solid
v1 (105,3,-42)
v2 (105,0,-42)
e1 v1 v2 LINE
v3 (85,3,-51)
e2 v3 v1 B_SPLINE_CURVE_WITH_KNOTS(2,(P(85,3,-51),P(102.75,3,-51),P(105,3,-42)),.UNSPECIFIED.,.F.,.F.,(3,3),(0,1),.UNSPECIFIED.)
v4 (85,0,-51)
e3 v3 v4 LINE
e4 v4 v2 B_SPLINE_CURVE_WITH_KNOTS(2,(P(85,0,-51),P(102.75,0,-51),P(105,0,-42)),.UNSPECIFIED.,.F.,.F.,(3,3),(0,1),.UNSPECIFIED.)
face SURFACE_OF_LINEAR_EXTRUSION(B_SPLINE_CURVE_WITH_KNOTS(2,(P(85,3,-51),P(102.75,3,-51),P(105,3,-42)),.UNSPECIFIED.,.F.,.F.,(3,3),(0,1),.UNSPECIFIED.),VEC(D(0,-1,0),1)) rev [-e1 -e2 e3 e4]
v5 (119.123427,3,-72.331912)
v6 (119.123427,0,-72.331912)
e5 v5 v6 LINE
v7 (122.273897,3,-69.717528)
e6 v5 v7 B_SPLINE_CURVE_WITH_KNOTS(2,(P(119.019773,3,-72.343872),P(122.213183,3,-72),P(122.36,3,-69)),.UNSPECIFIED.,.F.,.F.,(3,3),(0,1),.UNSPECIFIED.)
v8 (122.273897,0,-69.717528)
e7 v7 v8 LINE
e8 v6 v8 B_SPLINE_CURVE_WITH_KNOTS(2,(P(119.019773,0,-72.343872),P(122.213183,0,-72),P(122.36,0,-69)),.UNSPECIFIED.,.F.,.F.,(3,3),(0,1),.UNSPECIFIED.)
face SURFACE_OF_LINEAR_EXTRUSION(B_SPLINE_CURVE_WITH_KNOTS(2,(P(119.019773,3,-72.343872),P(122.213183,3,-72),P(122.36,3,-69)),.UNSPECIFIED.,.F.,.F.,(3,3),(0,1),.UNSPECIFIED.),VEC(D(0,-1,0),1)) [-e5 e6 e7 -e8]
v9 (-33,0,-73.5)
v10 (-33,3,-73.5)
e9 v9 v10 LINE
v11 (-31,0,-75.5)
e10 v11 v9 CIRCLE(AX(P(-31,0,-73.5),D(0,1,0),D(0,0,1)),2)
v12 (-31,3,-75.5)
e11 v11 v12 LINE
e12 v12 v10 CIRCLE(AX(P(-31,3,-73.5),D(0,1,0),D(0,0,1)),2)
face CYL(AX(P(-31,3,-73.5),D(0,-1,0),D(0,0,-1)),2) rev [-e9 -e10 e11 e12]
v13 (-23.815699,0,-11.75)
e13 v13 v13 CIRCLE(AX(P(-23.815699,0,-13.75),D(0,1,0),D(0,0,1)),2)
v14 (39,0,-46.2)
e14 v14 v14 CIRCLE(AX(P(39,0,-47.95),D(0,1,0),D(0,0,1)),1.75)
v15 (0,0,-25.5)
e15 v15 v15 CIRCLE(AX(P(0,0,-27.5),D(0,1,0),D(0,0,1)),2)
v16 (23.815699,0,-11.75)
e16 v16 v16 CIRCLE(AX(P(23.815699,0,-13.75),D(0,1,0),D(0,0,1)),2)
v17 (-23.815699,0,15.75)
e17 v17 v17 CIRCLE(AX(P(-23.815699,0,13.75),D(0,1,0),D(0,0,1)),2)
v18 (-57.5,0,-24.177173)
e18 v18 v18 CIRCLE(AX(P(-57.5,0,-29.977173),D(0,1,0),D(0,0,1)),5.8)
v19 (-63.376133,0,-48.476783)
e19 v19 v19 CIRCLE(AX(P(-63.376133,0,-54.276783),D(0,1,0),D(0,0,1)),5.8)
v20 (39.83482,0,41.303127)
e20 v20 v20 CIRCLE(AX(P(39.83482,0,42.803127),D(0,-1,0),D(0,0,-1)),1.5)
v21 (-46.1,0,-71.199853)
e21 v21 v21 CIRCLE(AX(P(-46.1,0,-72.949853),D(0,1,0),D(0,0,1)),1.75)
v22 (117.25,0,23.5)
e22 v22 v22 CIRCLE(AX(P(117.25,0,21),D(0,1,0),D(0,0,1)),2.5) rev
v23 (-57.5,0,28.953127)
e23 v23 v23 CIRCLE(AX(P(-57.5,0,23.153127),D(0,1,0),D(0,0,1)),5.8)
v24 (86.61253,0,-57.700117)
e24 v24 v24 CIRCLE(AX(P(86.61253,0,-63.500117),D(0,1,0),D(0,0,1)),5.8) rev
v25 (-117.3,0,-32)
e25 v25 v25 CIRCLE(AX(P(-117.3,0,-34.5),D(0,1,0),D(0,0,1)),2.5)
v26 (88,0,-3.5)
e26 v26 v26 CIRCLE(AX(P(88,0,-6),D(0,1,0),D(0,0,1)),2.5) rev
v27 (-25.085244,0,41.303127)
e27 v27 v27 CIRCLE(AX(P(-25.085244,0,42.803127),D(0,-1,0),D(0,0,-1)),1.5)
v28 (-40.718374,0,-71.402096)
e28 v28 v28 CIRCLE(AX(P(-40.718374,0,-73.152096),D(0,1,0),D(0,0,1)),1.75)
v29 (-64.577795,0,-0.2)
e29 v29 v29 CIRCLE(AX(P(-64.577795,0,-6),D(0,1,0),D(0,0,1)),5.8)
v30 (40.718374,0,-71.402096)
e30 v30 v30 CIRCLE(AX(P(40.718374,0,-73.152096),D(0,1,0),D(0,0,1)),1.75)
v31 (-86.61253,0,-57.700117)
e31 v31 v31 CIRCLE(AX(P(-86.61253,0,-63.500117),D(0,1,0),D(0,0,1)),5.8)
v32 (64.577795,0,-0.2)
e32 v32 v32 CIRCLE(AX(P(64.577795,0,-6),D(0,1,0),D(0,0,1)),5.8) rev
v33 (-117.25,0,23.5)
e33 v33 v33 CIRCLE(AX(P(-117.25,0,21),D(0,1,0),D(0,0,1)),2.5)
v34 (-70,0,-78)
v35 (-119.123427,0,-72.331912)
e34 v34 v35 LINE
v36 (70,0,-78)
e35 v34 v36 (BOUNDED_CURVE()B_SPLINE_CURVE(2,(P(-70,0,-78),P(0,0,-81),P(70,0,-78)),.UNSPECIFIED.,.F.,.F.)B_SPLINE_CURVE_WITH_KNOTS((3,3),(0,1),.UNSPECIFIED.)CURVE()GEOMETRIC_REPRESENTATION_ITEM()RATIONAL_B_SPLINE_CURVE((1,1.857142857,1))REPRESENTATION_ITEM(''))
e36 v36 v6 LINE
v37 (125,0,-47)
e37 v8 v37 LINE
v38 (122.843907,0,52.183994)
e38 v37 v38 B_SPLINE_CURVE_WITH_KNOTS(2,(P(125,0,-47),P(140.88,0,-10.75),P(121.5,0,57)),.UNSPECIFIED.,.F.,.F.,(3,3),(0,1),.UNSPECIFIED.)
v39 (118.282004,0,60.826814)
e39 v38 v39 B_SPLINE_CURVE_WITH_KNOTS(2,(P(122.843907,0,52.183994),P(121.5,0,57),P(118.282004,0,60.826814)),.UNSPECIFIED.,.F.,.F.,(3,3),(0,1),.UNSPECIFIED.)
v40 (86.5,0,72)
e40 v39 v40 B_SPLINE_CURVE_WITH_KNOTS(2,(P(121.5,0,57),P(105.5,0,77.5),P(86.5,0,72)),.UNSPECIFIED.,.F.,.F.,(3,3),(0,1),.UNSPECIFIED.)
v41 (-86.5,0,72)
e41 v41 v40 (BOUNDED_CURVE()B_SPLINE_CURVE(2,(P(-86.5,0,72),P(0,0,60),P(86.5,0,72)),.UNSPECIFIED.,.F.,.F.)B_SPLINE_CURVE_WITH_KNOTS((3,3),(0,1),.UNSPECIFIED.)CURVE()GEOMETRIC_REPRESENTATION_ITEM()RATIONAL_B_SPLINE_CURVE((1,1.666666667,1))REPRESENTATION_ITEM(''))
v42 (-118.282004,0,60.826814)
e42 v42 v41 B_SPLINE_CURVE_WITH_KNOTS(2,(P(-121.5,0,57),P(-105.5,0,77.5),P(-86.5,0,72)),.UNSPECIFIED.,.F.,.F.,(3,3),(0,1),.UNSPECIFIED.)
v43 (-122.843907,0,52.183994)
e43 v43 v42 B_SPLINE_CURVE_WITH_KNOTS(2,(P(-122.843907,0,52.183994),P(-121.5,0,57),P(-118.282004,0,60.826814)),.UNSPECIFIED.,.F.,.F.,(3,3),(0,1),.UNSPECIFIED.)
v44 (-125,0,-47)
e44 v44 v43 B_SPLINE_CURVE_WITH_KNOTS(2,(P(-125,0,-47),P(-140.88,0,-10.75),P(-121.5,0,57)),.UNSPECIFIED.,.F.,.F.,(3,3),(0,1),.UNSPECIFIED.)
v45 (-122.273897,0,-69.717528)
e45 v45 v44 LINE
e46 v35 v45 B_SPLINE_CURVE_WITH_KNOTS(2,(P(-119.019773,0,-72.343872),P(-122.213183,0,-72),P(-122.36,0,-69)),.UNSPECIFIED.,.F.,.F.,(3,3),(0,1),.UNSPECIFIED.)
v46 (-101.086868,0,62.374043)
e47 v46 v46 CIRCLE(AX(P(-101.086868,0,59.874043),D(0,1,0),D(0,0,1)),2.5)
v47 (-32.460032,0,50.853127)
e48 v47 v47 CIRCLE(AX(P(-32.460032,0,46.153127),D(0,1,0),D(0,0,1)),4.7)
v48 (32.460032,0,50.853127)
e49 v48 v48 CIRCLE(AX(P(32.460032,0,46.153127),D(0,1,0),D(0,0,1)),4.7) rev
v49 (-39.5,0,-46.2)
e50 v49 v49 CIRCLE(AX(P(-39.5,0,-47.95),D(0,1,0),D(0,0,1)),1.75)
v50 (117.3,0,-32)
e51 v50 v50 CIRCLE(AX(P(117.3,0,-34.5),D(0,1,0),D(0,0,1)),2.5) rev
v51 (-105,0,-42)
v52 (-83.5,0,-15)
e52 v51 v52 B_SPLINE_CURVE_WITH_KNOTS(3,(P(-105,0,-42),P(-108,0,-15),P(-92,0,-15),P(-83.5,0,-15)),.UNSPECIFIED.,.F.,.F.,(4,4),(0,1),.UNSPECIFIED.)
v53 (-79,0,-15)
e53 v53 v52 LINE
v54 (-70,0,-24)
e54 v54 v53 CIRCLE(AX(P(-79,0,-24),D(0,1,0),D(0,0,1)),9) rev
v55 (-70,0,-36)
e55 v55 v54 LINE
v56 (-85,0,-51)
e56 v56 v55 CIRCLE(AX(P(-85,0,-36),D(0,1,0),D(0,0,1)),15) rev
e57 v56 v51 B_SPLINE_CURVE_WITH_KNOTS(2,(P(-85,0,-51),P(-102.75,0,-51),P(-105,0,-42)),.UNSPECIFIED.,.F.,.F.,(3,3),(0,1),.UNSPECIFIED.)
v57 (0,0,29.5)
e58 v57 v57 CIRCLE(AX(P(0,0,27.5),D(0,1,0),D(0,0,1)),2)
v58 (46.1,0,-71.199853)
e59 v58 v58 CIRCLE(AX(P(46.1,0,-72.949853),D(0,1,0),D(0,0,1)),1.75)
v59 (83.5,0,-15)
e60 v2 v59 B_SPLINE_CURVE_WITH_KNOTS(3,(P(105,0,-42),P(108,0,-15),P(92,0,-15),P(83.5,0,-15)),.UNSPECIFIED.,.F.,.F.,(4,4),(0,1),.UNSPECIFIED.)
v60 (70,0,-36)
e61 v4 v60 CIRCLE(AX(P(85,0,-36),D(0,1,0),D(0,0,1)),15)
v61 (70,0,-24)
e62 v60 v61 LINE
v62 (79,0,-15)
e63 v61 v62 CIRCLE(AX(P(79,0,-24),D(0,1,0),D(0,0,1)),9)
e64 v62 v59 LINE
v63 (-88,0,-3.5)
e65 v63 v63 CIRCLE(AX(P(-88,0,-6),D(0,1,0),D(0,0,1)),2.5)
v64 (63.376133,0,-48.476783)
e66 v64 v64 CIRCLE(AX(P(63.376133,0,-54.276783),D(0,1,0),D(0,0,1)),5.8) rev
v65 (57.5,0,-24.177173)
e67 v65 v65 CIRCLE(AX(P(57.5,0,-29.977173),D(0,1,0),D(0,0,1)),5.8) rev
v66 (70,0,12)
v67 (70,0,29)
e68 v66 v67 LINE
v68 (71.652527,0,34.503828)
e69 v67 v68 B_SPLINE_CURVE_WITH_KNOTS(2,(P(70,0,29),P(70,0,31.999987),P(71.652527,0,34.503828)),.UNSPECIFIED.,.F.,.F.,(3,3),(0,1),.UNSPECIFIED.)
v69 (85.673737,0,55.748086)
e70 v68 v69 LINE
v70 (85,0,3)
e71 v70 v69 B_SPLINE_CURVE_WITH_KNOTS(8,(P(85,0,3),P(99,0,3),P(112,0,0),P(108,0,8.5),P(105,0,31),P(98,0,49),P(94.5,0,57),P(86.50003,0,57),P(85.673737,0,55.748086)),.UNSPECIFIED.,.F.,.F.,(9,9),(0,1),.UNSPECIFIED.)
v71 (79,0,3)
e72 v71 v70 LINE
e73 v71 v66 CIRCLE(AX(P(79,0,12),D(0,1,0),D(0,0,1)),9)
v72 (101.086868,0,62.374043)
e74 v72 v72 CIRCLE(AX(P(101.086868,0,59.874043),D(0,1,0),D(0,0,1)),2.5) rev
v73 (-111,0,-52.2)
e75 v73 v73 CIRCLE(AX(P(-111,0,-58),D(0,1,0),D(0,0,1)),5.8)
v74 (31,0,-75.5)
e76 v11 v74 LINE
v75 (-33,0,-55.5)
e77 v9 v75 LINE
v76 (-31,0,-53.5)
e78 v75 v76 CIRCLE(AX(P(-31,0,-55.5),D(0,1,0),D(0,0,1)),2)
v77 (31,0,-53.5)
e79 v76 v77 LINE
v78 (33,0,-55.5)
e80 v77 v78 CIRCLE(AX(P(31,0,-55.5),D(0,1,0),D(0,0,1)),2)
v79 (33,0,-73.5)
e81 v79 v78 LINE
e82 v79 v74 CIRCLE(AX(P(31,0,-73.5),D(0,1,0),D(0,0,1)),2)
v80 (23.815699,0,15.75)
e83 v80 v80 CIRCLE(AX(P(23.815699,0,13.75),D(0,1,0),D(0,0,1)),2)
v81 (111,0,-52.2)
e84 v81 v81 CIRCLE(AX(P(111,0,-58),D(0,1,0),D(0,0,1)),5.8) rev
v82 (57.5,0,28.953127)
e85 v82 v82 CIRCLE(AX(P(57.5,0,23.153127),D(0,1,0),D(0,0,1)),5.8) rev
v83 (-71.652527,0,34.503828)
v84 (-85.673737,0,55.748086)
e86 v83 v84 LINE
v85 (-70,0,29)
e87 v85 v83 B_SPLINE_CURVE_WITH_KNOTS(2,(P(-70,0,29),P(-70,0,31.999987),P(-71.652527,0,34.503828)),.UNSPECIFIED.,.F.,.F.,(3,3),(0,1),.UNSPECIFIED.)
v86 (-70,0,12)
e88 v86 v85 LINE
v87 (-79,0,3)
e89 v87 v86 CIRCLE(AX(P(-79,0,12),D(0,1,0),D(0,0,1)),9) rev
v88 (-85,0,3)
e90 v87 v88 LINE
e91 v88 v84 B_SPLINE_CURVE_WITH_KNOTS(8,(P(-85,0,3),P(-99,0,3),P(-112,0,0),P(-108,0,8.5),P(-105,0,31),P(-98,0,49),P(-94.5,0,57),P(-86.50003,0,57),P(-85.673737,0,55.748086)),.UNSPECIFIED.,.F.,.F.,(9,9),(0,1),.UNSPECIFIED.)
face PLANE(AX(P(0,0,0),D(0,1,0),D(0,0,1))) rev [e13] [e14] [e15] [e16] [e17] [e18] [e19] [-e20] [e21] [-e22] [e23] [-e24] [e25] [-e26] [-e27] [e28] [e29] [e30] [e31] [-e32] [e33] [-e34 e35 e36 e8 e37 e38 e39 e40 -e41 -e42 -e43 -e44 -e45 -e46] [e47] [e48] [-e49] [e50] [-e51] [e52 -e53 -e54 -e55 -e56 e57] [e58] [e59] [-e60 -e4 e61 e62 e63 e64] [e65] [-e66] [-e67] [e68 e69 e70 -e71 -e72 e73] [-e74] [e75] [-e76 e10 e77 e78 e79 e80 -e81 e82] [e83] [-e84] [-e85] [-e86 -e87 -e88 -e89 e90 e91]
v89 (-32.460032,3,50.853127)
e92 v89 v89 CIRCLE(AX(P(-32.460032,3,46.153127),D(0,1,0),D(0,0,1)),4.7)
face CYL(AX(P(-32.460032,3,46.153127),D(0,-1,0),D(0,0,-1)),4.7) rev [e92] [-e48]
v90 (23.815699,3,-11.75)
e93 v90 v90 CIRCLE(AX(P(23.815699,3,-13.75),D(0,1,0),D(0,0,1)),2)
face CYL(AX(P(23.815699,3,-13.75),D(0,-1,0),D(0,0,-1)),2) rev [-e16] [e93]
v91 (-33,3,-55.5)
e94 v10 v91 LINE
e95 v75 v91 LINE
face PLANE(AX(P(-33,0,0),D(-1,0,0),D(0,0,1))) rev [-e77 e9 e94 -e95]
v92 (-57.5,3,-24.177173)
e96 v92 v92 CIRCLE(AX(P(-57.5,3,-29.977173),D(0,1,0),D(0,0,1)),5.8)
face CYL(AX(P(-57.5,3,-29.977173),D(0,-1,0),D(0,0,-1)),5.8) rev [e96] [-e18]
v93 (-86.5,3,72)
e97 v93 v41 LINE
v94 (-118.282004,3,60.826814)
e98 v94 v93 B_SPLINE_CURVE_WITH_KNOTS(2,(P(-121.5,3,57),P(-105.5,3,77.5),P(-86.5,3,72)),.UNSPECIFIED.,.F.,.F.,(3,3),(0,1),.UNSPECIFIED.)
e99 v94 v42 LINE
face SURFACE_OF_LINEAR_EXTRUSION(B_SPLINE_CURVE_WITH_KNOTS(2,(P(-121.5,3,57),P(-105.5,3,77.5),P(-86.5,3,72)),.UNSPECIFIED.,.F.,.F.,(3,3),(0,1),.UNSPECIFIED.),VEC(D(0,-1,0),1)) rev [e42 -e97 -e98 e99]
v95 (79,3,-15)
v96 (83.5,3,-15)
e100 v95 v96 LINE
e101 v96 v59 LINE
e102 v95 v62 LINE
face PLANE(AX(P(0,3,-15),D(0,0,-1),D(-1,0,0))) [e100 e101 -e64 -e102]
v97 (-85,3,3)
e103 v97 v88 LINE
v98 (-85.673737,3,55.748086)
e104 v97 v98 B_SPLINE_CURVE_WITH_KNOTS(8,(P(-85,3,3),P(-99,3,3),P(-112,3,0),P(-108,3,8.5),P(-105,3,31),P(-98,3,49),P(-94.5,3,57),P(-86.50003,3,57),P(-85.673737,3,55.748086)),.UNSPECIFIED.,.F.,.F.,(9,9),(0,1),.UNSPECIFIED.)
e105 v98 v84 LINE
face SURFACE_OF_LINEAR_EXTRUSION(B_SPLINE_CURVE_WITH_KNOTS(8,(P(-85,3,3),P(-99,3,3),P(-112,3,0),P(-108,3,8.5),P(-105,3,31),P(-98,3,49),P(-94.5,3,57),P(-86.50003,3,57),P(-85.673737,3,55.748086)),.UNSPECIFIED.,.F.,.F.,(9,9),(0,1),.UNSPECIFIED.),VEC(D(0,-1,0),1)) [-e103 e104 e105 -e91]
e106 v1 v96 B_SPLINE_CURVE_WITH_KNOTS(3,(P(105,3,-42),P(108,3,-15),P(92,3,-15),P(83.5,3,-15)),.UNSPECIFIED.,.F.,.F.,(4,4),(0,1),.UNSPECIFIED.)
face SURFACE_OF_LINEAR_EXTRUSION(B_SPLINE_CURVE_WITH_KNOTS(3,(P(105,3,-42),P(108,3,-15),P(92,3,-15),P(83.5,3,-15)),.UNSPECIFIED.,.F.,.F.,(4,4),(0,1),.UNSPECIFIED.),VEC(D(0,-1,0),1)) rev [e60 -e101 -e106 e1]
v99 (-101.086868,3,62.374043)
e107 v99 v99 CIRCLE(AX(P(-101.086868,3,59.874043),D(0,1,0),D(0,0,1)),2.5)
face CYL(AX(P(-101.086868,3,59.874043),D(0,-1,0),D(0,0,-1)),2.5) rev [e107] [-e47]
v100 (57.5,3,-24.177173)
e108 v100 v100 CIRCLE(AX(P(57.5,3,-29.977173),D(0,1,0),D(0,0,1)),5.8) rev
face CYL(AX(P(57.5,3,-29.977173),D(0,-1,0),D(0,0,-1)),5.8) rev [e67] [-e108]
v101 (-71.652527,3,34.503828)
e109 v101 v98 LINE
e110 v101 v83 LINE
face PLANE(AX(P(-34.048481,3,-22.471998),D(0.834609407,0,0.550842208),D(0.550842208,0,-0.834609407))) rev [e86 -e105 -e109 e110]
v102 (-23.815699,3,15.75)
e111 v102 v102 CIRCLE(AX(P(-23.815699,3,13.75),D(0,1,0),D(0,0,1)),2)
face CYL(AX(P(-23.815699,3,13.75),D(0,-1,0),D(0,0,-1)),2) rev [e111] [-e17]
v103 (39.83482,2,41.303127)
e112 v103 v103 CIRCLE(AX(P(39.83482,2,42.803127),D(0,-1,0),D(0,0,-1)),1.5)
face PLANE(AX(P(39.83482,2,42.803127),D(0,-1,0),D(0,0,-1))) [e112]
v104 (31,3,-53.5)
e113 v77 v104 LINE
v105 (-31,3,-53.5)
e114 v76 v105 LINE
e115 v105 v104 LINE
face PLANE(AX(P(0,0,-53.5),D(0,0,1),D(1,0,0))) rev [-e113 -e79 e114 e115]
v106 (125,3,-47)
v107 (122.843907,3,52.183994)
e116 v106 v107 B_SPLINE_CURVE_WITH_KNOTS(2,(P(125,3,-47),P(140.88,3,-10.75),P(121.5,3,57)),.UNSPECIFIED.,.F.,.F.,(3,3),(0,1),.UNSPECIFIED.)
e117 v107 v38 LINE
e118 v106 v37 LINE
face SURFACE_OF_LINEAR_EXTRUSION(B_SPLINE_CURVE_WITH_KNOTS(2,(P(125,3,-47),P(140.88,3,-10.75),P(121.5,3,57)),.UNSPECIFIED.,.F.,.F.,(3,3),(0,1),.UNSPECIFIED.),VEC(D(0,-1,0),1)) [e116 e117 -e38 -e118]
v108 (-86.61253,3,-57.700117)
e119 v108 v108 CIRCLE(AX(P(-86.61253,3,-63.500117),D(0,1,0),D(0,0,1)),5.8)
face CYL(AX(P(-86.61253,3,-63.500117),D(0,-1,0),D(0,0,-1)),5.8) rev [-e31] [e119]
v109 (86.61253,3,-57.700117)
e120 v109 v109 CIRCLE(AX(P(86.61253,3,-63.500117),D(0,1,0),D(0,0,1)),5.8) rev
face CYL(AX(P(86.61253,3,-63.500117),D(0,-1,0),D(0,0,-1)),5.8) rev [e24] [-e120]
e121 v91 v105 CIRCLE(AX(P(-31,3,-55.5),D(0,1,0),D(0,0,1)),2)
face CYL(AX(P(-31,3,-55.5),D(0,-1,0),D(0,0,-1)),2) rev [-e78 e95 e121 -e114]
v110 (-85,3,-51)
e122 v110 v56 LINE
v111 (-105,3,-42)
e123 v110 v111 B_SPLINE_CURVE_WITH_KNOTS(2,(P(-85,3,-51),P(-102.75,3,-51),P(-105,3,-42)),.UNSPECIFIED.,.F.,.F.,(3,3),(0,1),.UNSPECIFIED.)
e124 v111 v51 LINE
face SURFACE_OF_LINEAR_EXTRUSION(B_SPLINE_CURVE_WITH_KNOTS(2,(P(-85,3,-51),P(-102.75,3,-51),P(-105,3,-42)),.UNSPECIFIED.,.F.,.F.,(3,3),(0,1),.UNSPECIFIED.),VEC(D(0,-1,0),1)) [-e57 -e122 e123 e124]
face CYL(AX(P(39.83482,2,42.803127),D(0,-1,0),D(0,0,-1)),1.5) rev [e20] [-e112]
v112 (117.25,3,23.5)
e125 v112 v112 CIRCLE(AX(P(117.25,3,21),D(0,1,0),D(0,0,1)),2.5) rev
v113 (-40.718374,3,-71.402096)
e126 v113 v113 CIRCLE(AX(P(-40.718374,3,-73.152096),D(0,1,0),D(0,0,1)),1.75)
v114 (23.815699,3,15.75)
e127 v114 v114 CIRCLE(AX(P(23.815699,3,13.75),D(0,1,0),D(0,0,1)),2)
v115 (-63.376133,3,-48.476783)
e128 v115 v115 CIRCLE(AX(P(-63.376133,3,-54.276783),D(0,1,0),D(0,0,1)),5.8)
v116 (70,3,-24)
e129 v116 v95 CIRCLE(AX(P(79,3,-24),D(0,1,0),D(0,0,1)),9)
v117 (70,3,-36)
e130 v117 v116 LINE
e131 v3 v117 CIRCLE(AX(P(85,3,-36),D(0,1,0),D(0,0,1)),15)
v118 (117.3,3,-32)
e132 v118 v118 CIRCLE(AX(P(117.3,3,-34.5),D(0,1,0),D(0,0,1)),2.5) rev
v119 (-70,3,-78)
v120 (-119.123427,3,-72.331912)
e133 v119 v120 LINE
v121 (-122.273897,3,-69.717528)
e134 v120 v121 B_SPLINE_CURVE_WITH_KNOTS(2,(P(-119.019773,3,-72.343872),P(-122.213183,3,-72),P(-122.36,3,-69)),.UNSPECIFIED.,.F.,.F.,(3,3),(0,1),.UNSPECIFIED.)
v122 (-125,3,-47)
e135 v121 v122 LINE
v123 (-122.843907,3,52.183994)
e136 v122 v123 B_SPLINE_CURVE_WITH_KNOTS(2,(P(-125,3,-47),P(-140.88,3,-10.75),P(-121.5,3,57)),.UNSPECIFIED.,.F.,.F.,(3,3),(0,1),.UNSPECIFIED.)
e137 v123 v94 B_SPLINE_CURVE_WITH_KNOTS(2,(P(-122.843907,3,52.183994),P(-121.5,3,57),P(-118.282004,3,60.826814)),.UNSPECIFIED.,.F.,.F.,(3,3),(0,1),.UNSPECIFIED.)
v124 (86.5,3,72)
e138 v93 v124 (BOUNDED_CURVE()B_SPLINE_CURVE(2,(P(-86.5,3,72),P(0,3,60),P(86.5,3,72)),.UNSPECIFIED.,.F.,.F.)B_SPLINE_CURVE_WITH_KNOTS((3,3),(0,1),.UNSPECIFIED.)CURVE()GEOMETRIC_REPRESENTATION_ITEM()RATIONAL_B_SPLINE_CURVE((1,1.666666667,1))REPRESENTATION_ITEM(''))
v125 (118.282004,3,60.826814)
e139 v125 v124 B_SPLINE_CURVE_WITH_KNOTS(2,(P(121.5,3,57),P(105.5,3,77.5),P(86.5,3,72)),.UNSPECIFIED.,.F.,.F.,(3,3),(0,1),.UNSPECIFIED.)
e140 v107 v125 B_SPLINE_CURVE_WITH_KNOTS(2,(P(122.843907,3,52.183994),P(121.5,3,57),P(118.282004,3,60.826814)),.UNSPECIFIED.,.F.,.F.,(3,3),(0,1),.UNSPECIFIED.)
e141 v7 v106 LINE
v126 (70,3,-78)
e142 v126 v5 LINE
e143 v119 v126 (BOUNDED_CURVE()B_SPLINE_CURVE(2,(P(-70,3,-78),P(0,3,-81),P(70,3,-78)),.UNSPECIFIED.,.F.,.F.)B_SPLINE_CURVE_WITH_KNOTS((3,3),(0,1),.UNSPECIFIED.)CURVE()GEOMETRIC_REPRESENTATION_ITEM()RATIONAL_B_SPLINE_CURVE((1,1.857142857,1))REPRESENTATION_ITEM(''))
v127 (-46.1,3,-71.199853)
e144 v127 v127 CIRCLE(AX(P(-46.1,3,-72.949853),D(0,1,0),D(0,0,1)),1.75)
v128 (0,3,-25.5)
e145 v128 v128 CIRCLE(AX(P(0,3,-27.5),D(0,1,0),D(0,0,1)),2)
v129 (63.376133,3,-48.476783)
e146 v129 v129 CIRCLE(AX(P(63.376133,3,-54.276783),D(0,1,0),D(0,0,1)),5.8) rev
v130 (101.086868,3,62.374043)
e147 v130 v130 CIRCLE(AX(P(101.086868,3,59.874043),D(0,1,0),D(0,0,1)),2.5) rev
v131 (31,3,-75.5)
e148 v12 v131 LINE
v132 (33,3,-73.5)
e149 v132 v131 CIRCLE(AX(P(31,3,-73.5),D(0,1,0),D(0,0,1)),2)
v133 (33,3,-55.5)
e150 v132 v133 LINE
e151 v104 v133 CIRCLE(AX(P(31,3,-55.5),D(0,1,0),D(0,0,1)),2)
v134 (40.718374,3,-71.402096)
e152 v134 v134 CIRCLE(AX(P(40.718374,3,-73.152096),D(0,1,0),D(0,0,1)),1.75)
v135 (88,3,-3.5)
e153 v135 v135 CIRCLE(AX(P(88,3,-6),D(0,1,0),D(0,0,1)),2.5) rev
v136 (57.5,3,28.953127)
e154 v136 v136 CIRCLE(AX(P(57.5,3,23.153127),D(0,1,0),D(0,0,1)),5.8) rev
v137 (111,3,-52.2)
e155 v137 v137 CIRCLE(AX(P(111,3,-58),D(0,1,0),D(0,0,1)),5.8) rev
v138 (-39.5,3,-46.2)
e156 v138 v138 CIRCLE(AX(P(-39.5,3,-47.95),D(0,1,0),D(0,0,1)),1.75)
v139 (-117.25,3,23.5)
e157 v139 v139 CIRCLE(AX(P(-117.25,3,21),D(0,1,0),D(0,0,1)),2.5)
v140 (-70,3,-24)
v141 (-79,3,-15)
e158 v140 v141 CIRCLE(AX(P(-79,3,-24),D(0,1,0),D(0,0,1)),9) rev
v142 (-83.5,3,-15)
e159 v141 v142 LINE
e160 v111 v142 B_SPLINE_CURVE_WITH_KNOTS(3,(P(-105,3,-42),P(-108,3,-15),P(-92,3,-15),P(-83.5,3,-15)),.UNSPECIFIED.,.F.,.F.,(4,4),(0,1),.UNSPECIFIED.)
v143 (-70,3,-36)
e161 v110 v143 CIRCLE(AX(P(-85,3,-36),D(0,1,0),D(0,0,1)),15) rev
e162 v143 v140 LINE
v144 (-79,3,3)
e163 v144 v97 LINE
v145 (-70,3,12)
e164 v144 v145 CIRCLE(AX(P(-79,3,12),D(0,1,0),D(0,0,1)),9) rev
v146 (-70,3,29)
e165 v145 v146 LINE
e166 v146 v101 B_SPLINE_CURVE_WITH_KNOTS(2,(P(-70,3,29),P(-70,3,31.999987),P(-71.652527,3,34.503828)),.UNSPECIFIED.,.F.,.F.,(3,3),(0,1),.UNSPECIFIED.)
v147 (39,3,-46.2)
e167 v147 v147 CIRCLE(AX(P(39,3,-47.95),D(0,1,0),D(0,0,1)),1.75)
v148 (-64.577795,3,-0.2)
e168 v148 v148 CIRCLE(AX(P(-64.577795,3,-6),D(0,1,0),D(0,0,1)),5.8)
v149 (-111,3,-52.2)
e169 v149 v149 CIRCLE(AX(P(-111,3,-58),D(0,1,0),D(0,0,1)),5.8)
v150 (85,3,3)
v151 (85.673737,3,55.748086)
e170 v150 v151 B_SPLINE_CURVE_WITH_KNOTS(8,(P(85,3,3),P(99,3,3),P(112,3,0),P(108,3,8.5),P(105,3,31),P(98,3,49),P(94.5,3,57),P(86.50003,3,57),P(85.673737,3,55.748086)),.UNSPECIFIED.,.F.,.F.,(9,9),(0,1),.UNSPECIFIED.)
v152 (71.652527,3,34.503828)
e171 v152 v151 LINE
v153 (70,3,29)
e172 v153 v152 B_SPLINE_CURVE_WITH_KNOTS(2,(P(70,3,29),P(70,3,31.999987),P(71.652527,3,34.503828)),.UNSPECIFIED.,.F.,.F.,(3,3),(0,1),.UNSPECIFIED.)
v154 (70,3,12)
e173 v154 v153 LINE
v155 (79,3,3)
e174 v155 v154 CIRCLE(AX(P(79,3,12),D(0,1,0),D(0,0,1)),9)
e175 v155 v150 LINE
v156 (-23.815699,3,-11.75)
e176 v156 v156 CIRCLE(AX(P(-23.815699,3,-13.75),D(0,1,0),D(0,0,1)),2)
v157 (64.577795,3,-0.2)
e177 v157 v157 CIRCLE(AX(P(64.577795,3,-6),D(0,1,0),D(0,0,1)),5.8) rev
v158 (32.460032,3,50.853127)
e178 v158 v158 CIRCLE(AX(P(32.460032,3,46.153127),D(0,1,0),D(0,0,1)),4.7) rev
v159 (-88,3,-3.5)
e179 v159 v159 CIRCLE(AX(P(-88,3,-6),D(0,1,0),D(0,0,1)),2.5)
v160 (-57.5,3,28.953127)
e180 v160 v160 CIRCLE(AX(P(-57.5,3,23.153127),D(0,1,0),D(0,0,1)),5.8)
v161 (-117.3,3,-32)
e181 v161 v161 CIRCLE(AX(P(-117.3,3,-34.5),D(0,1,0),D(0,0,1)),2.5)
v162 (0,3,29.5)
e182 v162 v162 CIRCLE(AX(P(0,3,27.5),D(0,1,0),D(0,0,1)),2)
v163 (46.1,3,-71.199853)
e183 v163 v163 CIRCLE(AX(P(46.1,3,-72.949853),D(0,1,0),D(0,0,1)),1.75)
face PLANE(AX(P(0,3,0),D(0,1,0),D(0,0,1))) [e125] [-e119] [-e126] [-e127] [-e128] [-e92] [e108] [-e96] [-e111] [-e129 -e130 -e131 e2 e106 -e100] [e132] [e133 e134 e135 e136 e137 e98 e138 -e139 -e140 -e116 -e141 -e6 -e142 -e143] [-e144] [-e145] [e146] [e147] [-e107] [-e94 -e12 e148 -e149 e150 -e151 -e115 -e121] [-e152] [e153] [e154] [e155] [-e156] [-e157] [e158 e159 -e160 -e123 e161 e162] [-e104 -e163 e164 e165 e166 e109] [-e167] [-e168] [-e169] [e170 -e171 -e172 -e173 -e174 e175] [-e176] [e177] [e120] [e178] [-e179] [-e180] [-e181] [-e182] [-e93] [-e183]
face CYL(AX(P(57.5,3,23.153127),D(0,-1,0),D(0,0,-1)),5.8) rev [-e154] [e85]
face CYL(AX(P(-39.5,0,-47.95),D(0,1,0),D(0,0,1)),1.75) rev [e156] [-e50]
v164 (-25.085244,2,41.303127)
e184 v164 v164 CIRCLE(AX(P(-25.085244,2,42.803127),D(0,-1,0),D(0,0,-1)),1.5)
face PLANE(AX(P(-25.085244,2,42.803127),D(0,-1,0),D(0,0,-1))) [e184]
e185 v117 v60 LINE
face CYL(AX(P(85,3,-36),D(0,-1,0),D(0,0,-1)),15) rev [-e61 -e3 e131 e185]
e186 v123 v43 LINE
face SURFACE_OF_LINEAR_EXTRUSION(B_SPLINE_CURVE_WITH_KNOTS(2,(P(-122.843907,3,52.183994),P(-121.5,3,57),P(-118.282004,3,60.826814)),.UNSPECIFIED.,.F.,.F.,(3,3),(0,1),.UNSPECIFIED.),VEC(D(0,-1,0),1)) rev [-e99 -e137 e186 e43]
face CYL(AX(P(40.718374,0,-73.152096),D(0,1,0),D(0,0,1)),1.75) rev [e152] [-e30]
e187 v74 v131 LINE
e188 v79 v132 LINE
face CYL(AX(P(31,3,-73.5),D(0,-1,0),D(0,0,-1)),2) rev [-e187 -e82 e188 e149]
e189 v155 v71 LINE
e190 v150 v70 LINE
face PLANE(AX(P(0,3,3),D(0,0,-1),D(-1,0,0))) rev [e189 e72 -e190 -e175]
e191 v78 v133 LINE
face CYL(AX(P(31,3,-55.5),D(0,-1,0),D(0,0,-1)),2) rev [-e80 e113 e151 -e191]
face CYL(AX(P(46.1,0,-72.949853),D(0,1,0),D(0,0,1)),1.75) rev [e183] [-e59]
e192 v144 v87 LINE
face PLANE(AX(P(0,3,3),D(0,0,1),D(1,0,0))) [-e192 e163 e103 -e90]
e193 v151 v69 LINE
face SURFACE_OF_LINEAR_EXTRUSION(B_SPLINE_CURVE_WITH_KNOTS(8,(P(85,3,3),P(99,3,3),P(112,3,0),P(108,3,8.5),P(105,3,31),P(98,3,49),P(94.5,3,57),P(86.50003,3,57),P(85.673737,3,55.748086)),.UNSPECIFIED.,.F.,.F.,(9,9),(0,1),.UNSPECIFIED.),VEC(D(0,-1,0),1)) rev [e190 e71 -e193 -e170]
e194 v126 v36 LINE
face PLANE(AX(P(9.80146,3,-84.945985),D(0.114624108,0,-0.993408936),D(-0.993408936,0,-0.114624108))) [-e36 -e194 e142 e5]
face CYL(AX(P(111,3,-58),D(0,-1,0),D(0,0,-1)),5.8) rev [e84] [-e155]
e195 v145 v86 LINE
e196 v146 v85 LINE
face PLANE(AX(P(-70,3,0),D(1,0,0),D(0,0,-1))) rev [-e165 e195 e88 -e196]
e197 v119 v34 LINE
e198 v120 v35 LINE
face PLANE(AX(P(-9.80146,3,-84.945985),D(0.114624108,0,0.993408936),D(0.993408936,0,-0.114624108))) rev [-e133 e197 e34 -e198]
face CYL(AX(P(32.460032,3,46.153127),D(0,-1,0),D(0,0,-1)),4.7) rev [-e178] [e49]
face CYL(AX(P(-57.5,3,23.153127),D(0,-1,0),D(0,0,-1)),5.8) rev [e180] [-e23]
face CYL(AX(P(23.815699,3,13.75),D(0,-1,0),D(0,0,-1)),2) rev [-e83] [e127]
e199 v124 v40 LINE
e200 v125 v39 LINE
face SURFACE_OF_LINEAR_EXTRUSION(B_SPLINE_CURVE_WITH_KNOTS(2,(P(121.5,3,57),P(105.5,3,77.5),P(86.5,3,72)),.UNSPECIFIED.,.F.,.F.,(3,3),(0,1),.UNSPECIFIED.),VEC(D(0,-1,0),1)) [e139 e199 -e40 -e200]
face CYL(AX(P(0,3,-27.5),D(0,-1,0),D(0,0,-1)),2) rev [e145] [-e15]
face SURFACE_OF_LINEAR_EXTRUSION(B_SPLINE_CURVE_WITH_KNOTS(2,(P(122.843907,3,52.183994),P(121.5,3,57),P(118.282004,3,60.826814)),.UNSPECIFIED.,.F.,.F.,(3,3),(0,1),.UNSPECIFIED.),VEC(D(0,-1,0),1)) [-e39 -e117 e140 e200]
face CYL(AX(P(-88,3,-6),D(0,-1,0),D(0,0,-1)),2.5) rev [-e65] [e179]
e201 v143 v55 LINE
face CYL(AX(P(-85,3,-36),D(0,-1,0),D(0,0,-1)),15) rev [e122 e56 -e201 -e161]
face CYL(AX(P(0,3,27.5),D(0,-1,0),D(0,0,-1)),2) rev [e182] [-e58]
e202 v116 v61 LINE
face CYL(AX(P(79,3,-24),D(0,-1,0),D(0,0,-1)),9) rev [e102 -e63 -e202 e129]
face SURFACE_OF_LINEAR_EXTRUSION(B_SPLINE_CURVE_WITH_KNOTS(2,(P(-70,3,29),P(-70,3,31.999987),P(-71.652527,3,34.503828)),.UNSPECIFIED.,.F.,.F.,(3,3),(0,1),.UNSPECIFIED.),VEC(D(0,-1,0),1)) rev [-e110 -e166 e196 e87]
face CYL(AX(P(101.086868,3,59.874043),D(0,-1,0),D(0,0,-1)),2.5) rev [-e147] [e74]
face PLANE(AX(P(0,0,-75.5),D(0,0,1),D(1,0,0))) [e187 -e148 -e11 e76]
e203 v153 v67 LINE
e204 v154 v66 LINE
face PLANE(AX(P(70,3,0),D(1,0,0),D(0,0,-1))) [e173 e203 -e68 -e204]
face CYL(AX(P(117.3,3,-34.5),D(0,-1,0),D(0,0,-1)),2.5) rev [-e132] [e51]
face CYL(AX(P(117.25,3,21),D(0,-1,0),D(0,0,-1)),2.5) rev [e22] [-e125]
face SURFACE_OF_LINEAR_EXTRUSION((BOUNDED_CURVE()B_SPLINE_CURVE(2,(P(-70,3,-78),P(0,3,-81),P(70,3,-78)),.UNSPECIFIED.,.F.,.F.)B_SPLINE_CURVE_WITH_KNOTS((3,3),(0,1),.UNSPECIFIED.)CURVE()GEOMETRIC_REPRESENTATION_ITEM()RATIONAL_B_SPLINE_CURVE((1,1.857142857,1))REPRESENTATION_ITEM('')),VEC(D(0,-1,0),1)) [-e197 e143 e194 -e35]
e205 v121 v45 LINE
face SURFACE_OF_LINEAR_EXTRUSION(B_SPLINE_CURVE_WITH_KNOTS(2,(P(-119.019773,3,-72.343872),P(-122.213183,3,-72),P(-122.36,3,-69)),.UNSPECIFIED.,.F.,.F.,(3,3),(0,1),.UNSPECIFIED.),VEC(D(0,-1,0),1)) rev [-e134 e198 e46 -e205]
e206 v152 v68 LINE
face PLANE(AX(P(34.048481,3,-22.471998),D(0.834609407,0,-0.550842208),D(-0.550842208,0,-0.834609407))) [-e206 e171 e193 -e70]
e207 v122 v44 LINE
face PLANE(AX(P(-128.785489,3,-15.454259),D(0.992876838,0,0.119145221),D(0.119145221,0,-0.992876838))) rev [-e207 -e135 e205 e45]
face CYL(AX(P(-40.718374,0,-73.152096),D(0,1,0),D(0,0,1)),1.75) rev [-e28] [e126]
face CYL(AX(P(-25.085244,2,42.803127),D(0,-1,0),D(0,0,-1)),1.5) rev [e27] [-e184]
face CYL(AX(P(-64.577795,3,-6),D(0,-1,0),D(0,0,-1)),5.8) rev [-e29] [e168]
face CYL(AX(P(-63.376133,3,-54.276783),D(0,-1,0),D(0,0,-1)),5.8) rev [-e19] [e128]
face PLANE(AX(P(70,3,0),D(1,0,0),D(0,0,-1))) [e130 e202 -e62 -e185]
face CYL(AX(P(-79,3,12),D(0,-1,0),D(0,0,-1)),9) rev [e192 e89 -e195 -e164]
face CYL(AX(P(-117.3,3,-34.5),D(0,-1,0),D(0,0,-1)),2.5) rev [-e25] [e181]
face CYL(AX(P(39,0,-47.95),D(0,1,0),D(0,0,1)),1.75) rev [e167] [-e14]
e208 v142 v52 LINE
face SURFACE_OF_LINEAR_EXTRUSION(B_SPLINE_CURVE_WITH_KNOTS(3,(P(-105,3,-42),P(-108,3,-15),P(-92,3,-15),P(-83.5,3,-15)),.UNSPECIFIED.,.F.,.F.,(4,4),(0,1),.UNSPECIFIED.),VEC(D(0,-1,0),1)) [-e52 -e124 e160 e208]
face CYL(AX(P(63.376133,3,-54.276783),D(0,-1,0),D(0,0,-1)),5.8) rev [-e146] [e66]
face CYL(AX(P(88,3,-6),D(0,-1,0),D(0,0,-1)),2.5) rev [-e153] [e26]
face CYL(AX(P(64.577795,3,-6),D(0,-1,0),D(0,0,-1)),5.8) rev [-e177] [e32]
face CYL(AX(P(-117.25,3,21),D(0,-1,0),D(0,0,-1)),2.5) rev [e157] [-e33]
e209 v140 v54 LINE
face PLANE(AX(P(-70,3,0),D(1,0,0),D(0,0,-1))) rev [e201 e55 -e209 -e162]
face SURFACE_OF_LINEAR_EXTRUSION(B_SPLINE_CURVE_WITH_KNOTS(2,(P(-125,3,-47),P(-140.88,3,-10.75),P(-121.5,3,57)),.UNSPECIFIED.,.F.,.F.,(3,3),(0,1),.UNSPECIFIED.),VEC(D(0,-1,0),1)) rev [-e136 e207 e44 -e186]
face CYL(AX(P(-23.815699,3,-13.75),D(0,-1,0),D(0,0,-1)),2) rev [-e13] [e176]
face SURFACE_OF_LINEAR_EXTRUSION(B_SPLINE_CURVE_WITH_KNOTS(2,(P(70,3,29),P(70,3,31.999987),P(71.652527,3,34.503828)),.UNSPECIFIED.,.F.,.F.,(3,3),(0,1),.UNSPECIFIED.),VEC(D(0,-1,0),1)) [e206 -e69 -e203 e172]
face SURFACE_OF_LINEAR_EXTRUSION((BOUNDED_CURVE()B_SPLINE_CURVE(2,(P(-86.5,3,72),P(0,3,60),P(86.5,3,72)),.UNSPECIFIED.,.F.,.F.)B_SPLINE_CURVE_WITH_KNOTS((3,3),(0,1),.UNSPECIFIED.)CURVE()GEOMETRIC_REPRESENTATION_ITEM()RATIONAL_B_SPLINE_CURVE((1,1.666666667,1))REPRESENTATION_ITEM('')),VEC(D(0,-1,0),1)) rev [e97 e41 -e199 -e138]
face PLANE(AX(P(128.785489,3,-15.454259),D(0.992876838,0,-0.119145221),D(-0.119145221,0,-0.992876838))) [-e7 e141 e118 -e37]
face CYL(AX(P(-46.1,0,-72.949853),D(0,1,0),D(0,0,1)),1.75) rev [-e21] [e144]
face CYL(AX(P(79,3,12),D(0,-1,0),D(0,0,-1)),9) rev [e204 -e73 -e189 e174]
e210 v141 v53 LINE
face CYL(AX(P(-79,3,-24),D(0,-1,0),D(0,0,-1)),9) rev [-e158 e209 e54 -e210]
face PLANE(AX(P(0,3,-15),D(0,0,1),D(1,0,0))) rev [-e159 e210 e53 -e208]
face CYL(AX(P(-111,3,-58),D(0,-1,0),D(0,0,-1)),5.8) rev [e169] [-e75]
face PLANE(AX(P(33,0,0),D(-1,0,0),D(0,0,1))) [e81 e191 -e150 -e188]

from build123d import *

# Parameters (mm, degrees)
BOSS_EXTRUDE1_OUTLINE_R   = 2.5
BOSS_EXTRUDE1_OUTLINE_R_2 = 4.7
BOSS_EXTRUDE1_OUTLINE_R_3 = 5.8
BOSS_EXTRUDE1_OUTLINE_R_4 = 2
BOSS_EXTRUDE1_DEPTH       = 3
SKETCH3_R                 = 1.5
CUT_EXTRUDE1_DEPTH        = 2
SKETCH5_W                 = 62
SKETCH5_H                 = 18
SKETCH5_W_2               = 2
SKETCH5_H_2               = 2
CUT_EXTRUDE4_DEPTH        = 3
SKETCH6_R                 = 1.75
CUT_EXTRUDE5_DEPTH        = 3


# Read off the part's stored shape, not the designer's step: Boss-Extrude1
with BuildPart() as part:
    # Boss-Extrude1 outline → Boss-Extrude1 (new body)
    with BuildSketch(Plane(origin=(0, 0, 0), x_dir=(1, 0, 0), z_dir=(0, 1, 0))):
        with BuildLine():
            Line((-70, 78), (-119.123426788, 72.331912294))
            add(Edge.make_bspline(
                [(-119.123426788, 72.331912294), (-121.817313074, 72.000000019), (-122.273896674, 69.717527721)],
                knots=[0.016356922, 0.016356922, 0.016356922, 0.873306336, 0.873306336, 0.873306336], degree=2))
            Line((-122.273896674, 69.717527721), (-125, 47))
            add(Edge.make_bspline(
                [(-125, 47), (-140.310843166, 12.049240253), (-122.843906966, -52.183993971)],
                knots=[0, 0, 0, 0.96415889, 0.96415889, 0.96415889], degree=2))
            add(Edge.make_bspline(
                [(-122.843906966, -52.183993971), (-121.5, -57), (-118.282004102, -60.826813609)],
                knots=[0, 0, 0, 1, 1, 1], degree=2))
            add(Edge.make_bspline(
                [(-118.282004102, -60.826813609), (-103.606996493, -76.952025301), (-86.5, -72)],
                knots=[0.099631764, 0.099631764, 0.099631764, 1, 1, 1], degree=2))
            add(Edge.make_bspline(
                [(-86.5, -72), (0, -60), (86.5, -72)],
                knots=[0, 0, 0, 1, 1, 1], degree=2, weights=[1, 1.666666667, 1]))
            add(Edge.make_bspline(
                [(118.282004106, -60.826813605), (103.606996495, -76.952025301), (86.5, -72)],
                knots=[0.099631763, 0.099631763, 0.099631763, 1, 1, 1], degree=2))
            add(Edge.make_bspline(
                [(122.843906966, -52.183993971), (121.5, -57), (118.282004106, -60.826813605)],
                knots=[0, 0, 0, 1, 1, 1], degree=2))
            add(Edge.make_bspline(
                [(125, 47), (140.310843171, 12.049240242), (122.843906966, -52.183993971)],
                knots=[0, 0, 0, 0.96415889, 0.96415889, 0.96415889], degree=2))
            Line((125, 47), (122.273896674, 69.717527721))
            add(Edge.make_bspline(
                [(119.123426788, 72.331912294), (121.817313074, 72.000000019), (122.273896674, 69.717527721)],
                knots=[0.016356922, 0.016356922, 0.016356922, 0.873306336, 0.873306336, 0.873306336], degree=2))
            Line((119.123426788, 72.331912294), (70, 78))
            add(Edge.make_bspline(
                [(-70, 78), (0, 81), (70, 78)],
                knots=[0, 0, 0, 1, 1, 1], degree=2, weights=[1, 1.857142857, 1]))
        make_face()
        with Locations((-101.086868344, -59.874042945)):
            Circle(BOSS_EXTRUDE1_OUTLINE_R, mode=Mode.SUBTRACT)
        with Locations((-32.460031949, -46.153127094)):
            Circle(BOSS_EXTRUDE1_OUTLINE_R_2, mode=Mode.SUBTRACT)
        with Locations((-117.25, -21)):
            Circle(BOSS_EXTRUDE1_OUTLINE_R, mode=Mode.SUBTRACT)
        with BuildLine():
            Line((-70, -12), (-70, -29))
            add(Edge.make_bspline(
                [(-70, -29), (-70, -31.999987298), (-71.652526625, -34.50382822)],
                knots=[0, 0, 0, 1, 1, 1], degree=2))
            Line((-71.652526625, -34.50382822), (-85.673736688, -55.74808589))
            add(Edge.make_bspline(
                [(-85, -3), (-99, -3), (-112, 0), (-108, -8.5), (-105, -31), (-98, -49), (-94.5, -57), (-86.500030089, -57), (-85.673736688, -55.74808589)],
                knots=[0, 0, 0, 0, 0, 0, 0, 0, 0, 1, 1, 1, 1, 1, 1, 1, 1, 1], degree=8))
            Line((-85, -3), (-79, -3))
            ThreePointArc((-79, -3), (-72.636038969, -5.636038969), (-70, -12))
        make_face(mode=Mode.SUBTRACT)
        with Locations((-57.5, -23.153127094)):
            Circle(BOSS_EXTRUDE1_OUTLINE_R_3, mode=Mode.SUBTRACT)
        with Locations((0, -27.5)):
            Circle(BOSS_EXTRUDE1_OUTLINE_R_4, mode=Mode.SUBTRACT)
        with Locations((-23.815698604, -13.75)):
            Circle(BOSS_EXTRUDE1_OUTLINE_R_4, mode=Mode.SUBTRACT)
        with Locations((32.460031949, -46.153127094)):
            Circle(BOSS_EXTRUDE1_OUTLINE_R_2, mode=Mode.SUBTRACT)
        with Locations((101.086868344, -59.874042945)):
            Circle(BOSS_EXTRUDE1_OUTLINE_R, mode=Mode.SUBTRACT)
        with Locations((57.5, -23.153127094)):
            Circle(BOSS_EXTRUDE1_OUTLINE_R_3, mode=Mode.SUBTRACT)
        with Locations((23.815698604, -13.75)):
            Circle(BOSS_EXTRUDE1_OUTLINE_R_4, mode=Mode.SUBTRACT)
        with BuildLine():
            add(Edge.make_bspline(
                [(85, -3), (99, -3), (112, 0), (108, -8.5), (105, -31), (98, -49), (94.5, -57), (86.500030089, -57), (85.673736688, -55.74808589)],
                knots=[0, 0, 0, 0, 0, 0, 0, 0, 0, 1, 1, 1, 1, 1, 1, 1, 1, 1], degree=8))
            Line((85.673736688, -55.74808589), (71.652526625, -34.50382822))
            add(Edge.make_bspline(
                [(70, -29), (70, -31.999987298), (71.652526625, -34.50382822)],
                knots=[0, 0, 0, 1, 1, 1], degree=2))
            Line((70, -29), (70, -12))
            ThreePointArc((70, -12), (72.636038969, -5.636038969), (79, -3))
            Line((79, -3), (85, -3))
        make_face(mode=Mode.SUBTRACT)
        with Locations((117.25, -21)):
            Circle(BOSS_EXTRUDE1_OUTLINE_R, mode=Mode.SUBTRACT)
        with Locations((-88, 6)):
            Circle(BOSS_EXTRUDE1_OUTLINE_R, mode=Mode.SUBTRACT)
        with Locations((-117.3, 34.5)):
            Circle(BOSS_EXTRUDE1_OUTLINE_R, mode=Mode.SUBTRACT)
        with BuildLine():
            add(Edge.make_bspline(
                [(-105, 42), (-108, 15), (-92, 15), (-83.5, 15)],
                knots=[0, 0, 0, 0, 1, 1, 1, 1], degree=3))
            add(Edge.make_bspline(
                [(-85, 51), (-102.75, 51), (-105, 42)],
                knots=[0, 0, 0, 1, 1, 1], degree=2))
            ThreePointArc((-85, 51), (-74.393398282, 46.606601718), (-70, 36))
            Line((-70, 36), (-70, 24))
            ThreePointArc((-70, 24), (-72.636038969, 17.636038969), (-79, 15))
            Line((-79, 15), (-83.5, 15))
        make_face(mode=Mode.SUBTRACT)
        with Locations((-64.577794898, 6)):
            Circle(BOSS_EXTRUDE1_OUTLINE_R_3, mode=Mode.SUBTRACT)
        with Locations((-23.815698604, 13.75)):
            Circle(BOSS_EXTRUDE1_OUTLINE_R_4, mode=Mode.SUBTRACT)
        with Locations((-57.5, 29.977172881)):
            Circle(BOSS_EXTRUDE1_OUTLINE_R_3, mode=Mode.SUBTRACT)
        with Locations((0, 27.5)):
            Circle(BOSS_EXTRUDE1_OUTLINE_R_4, mode=Mode.SUBTRACT)
        with Locations((-111, 58)):
            Circle(BOSS_EXTRUDE1_OUTLINE_R_3, mode=Mode.SUBTRACT)
        with Locations((-86.612529585, 63.500116978)):
            Circle(BOSS_EXTRUDE1_OUTLINE_R_3, mode=Mode.SUBTRACT)
        with Locations((-63.376133298, 54.276783114)):
            Circle(BOSS_EXTRUDE1_OUTLINE_R_3, mode=Mode.SUBTRACT)
        with Locations((-31, 55.5)):
            Circle(BOSS_EXTRUDE1_OUTLINE_R_4, mode=Mode.SUBTRACT)
        with Locations((-31, 73.5)):
            Circle(BOSS_EXTRUDE1_OUTLINE_R_4, mode=Mode.SUBTRACT)
        with Locations((23.815698604, 13.75)):
            Circle(BOSS_EXTRUDE1_OUTLINE_R_4, mode=Mode.SUBTRACT)
        with Locations((64.577794898, 6)):
            Circle(BOSS_EXTRUDE1_OUTLINE_R_3, mode=Mode.SUBTRACT)
        with Locations((57.5, 29.977172881)):
            Circle(BOSS_EXTRUDE1_OUTLINE_R_3, mode=Mode.SUBTRACT)
        with Locations((88, 6)):
            Circle(BOSS_EXTRUDE1_OUTLINE_R, mode=Mode.SUBTRACT)
        with BuildLine():
            ThreePointArc((70, 36), (74.393398282, 46.606601718), (85, 51))
            add(Edge.make_bspline(
                [(85, 51), (102.75, 51), (105, 42)],
                knots=[0, 0, 0, 1, 1, 1], degree=2))
            add(Edge.make_bspline(
                [(105, 42), (108, 15), (92, 15), (83.5, 15)],
                knots=[0, 0, 0, 0, 1, 1, 1, 1], degree=3))
            Line((83.5, 15), (79, 15))
            ThreePointArc((79, 15), (72.636038969, 17.636038969), (70, 24))
            Line((70, 24), (70, 36))
        make_face(mode=Mode.SUBTRACT)
        with Locations((117.3, 34.5)):
            Circle(BOSS_EXTRUDE1_OUTLINE_R, mode=Mode.SUBTRACT)
        with Locations((31, 55.5)):
            Circle(BOSS_EXTRUDE1_OUTLINE_R_4, mode=Mode.SUBTRACT)
        with Locations((63.376133298, 54.276783114)):
            Circle(BOSS_EXTRUDE1_OUTLINE_R_3, mode=Mode.SUBTRACT)
        with Locations((31, 73.5)):
            Circle(BOSS_EXTRUDE1_OUTLINE_R_4, mode=Mode.SUBTRACT)
        with Locations((111, 58)):
            Circle(BOSS_EXTRUDE1_OUTLINE_R_3, mode=Mode.SUBTRACT)
        with Locations((86.612529585, 63.500116978)):
            Circle(BOSS_EXTRUDE1_OUTLINE_R_3, mode=Mode.SUBTRACT)
    extrude(amount=BOSS_EXTRUDE1_DEPTH)

    # Sketch3 → Cut-Extrude1 (cut)
    with BuildSketch(Plane.XZ):
        with Locations(Location((-25.085243816, 42.803127094, 0), (0, 0, 270))):
            Circle(SKETCH3_R)
        with Locations(Location((39.834820081, 42.803127094, 0), (0, 0, 270))):
            Circle(SKETCH3_R)
    extrude(amount=-CUT_EXTRUDE1_DEPTH, mode=Mode.SUBTRACT)

    # Sketch5 → Cut-Extrude4 (cut)
    with BuildSketch(Plane(origin=(0, 3, 0), x_dir=(1, 0, 0), z_dir=(0, 1, 0))):
        with Locations((0, 64.5)):
            Rectangle(SKETCH5_W, SKETCH5_H)
        with Locations((-32, 64.5)):
            Rectangle(SKETCH5_W_2, SKETCH5_H)
        with Locations((0, 74.5)):
            Rectangle(SKETCH5_W, SKETCH5_H_2)
        with Locations((0, 54.5)):
            Rectangle(SKETCH5_W, SKETCH5_H_2)
        with Locations((32, 64.5)):
            Rectangle(SKETCH5_W_2, SKETCH5_H)
    extrude(amount=-CUT_EXTRUDE4_DEPTH, mode=Mode.SUBTRACT)

    # Sketch6 → Cut-Extrude5 (cut)
    with BuildSketch(Plane(origin=(0, 3, 0), x_dir=(1, 0, 0), z_dir=(0, 1, 0))):
        with Locations(Location((-46.1, 72.949853444, 0), (0, 0, 270))):
            Circle(SKETCH6_R)
        with Locations(Location((-39.5, 47.95, 0), (0, 0, 270))):
            Circle(SKETCH6_R)
        with Locations(Location((39, 47.95, 0), (0, 0, 270))):
            Circle(SKETCH6_R)
        with Locations(Location((46.1, 72.949853444, 0), (0, 0, 270))):
            Circle(SKETCH6_R)
        with Locations(Location((-40.718373628, 73.152096314, 0), (0, 0, 270))):
            Circle(SKETCH6_R)
        with Locations(Location((40.718373628, 73.152096314, 0), (0, 0, 270))):
            Circle(SKETCH6_R)
    extrude(amount=-CUT_EXTRUDE5_DEPTH, mode=Mode.SUBTRACT)


solid = part.part
